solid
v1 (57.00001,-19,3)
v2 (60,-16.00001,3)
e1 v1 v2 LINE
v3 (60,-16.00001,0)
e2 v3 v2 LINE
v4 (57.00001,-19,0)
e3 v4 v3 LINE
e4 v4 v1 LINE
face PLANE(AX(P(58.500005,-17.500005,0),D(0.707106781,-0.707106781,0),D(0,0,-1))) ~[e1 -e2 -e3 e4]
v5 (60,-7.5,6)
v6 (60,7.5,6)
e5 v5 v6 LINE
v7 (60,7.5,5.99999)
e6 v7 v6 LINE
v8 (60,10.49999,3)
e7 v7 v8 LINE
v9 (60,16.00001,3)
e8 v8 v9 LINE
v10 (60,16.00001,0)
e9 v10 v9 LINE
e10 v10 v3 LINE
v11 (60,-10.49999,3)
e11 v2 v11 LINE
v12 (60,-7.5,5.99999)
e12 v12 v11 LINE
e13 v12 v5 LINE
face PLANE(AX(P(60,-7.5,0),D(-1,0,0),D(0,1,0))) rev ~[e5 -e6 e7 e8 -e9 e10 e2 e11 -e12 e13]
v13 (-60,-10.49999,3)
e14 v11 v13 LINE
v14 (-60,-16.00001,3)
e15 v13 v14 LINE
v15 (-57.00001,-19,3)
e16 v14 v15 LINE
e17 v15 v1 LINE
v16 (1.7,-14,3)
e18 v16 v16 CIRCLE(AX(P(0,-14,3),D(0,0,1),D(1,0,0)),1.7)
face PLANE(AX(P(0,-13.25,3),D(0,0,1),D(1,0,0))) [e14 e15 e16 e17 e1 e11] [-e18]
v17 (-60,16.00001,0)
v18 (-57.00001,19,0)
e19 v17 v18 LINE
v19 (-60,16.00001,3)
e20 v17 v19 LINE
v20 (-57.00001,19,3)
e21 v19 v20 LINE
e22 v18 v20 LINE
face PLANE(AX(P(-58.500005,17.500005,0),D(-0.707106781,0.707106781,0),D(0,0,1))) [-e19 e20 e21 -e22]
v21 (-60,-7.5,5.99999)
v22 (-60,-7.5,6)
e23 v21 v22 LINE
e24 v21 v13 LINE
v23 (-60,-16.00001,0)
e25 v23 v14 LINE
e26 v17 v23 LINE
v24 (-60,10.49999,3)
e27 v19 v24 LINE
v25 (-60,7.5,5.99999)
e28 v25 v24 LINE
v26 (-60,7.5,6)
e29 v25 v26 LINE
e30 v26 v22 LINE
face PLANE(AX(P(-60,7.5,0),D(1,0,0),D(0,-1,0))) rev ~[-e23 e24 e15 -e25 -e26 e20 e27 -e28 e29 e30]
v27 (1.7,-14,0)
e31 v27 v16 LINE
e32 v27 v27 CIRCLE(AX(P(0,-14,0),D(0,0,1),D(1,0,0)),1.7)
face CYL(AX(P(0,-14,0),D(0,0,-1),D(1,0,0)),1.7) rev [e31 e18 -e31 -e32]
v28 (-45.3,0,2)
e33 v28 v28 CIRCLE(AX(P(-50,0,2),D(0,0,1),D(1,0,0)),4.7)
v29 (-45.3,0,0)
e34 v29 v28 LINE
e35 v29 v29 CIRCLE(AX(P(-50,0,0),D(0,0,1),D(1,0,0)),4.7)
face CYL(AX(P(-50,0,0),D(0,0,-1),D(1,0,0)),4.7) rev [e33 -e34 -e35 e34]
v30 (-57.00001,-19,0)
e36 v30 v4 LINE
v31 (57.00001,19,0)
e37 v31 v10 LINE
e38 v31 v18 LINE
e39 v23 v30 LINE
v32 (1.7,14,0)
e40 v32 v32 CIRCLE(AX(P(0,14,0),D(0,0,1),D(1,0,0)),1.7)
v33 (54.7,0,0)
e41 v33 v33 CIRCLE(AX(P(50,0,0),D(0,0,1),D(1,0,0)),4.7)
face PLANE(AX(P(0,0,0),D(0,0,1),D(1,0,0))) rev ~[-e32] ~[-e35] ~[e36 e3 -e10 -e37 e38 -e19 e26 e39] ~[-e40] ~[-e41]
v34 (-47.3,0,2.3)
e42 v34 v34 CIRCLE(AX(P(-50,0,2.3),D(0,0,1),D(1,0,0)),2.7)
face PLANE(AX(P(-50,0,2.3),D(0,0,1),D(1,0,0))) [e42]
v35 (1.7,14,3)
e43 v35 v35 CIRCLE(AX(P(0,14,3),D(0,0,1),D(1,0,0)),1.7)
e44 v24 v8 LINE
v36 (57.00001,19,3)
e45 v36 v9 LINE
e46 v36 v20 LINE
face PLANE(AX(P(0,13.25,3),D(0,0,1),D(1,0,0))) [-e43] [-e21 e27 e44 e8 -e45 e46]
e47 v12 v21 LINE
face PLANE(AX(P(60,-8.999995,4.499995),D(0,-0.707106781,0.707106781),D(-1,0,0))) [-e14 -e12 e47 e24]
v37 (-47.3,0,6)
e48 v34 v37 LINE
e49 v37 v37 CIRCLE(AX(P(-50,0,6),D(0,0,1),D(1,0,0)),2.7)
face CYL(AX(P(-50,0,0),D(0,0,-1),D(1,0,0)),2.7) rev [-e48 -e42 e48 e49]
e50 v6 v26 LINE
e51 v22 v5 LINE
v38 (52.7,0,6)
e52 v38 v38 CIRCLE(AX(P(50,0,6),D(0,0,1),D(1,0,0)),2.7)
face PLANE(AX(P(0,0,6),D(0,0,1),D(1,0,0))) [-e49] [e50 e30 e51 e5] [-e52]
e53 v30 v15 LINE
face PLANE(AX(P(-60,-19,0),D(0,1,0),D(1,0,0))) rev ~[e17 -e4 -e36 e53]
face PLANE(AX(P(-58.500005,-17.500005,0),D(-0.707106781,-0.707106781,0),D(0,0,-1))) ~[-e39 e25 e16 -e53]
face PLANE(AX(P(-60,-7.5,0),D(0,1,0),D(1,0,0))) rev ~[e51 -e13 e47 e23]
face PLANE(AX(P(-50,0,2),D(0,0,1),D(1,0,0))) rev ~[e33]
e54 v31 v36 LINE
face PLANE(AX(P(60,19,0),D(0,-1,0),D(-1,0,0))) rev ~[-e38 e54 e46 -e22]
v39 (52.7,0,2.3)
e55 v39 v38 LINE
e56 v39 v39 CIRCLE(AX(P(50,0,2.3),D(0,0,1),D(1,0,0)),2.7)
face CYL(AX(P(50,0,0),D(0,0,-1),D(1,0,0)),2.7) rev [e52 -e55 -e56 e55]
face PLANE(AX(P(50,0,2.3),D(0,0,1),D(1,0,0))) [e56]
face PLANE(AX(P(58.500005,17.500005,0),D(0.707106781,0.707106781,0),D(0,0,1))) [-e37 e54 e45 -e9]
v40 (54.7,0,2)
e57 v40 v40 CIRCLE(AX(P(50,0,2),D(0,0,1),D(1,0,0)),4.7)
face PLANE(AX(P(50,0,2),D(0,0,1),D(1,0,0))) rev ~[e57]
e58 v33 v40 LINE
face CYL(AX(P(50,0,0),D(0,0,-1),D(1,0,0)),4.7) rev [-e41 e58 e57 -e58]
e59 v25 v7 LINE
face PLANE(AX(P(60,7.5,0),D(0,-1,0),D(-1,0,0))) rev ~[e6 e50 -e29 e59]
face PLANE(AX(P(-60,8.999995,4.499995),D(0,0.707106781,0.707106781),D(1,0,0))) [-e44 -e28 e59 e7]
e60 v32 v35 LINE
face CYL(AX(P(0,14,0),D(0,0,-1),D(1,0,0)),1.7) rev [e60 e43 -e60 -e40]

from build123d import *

# Parameters (mm, degrees)
F0_R     = 1.7
F1_DEPTH = 3
F0_R_2   = 4.7
F0_R_3   = 2.7
F2_DEPTH = 6
F3_DEPTH = 2
F4_SIZE  = 2.99999
F5_START = 2
F5_DEPTH = 0.3


# Not quite as in the source:
# - a fillet or chamfer is up to 0.001 mm smaller than in the source, because OpenCascade refuses the exact size


with BuildPart() as f1:
    # F0 (on Top) → F1 (new body)
    with BuildSketch(Plane.XY):
        Polygon((12.5, 19), (-12.5, 19), (-60, 19), (-60, 7.5), (-12.5, 7.5), (12.5, 7.5), (60, 7.5), (60, 19), align=None)
        with Locations((0, 14)):
            Circle(F0_R, mode=Mode.SUBTRACT)
    extrude(amount=F1_DEPTH)



with BuildPart() as f1b:
    # F0 (on Top) → F1, piece 2 (new body)
    with BuildSketch(Plane.XY):
        Polygon((-12.5, -7.5), (-60, -7.5), (-60, -19), (-8.9196664095, -19), (8.9196664095, -19), (16.0803335905, -19), (60, -19), (60, -7.5), (12.5, -7.5), align=None)
        with Locations((0, -14)):
            Circle(F0_R, mode=Mode.SUBTRACT)
    extrude(amount=F1_DEPTH)


with BuildPart() as f1_1:
    add(f1.part)

    add(f1b.part)  # F2 merges F1b
    # F0 (on Top) → F2 (join)
    with BuildSketch(Plane.XY):
        Polygon((-12.5, 7.5), (-60, 7.5), (-60, -7.5), (-12.5, -7.5), (12.5, -7.5), (60, -7.5), (60, 7.5), (12.5, 7.5), align=None)
        with Locations((-50, 0)):
            Circle(F0_R_2, mode=Mode.SUBTRACT)
        with Locations((50, 0)):
            Circle(F0_R_2, mode=Mode.SUBTRACT)
        with Locations((-50, 0)):
            Circle(F0_R_2)
        with Locations((-50, 0)):
            Circle(F0_R_3, mode=Mode.SUBTRACT)
        with Locations((50, 0)):
            Circle(F0_R_2)
        with Locations((50, 0)):
            Circle(F0_R_3, mode=Mode.SUBTRACT)
    extrude(amount=F2_DEPTH)

    # F0 (on Top) → F3 (cut)
    with BuildSketch(Plane.XY):
        with Locations((-50, 0)):
            Circle(F0_R_2)
        with Locations((-50, 0)):
            Circle(F0_R_3, mode=Mode.SUBTRACT)
        with Locations((50, 0)):
            Circle(F0_R_2)
        with Locations((50, 0)):
            Circle(F0_R_3, mode=Mode.SUBTRACT)
    extrude(amount=F3_DEPTH, mode=Mode.SUBTRACT)

    # F4 (size 3 in the source; OpenCascade refuses exactly that, so slightly less here)
    f4_edges = [f1_1.edges().sort_by_distance(p)[0] for p in [
        (0, 7.5, 3),
        (0, -7.5, 3),
        (-60, -19, 1.5),
        (-60, 19, 1.5),
        (60, -19, 1.5),
        (60, 19, 1.5),
    ]]
    chamfer(f4_edges, length=F4_SIZE)

    # F0 (on Top) → F5 (join)
    with BuildSketch(Plane.XY.offset(F5_START)):
        with Locations((-50, 0)):
            Circle(F0_R_3)
        with Locations((50, 0)):
            Circle(F0_R_3)
    extrude(amount=F5_DEPTH)


solid = f1_1.part
